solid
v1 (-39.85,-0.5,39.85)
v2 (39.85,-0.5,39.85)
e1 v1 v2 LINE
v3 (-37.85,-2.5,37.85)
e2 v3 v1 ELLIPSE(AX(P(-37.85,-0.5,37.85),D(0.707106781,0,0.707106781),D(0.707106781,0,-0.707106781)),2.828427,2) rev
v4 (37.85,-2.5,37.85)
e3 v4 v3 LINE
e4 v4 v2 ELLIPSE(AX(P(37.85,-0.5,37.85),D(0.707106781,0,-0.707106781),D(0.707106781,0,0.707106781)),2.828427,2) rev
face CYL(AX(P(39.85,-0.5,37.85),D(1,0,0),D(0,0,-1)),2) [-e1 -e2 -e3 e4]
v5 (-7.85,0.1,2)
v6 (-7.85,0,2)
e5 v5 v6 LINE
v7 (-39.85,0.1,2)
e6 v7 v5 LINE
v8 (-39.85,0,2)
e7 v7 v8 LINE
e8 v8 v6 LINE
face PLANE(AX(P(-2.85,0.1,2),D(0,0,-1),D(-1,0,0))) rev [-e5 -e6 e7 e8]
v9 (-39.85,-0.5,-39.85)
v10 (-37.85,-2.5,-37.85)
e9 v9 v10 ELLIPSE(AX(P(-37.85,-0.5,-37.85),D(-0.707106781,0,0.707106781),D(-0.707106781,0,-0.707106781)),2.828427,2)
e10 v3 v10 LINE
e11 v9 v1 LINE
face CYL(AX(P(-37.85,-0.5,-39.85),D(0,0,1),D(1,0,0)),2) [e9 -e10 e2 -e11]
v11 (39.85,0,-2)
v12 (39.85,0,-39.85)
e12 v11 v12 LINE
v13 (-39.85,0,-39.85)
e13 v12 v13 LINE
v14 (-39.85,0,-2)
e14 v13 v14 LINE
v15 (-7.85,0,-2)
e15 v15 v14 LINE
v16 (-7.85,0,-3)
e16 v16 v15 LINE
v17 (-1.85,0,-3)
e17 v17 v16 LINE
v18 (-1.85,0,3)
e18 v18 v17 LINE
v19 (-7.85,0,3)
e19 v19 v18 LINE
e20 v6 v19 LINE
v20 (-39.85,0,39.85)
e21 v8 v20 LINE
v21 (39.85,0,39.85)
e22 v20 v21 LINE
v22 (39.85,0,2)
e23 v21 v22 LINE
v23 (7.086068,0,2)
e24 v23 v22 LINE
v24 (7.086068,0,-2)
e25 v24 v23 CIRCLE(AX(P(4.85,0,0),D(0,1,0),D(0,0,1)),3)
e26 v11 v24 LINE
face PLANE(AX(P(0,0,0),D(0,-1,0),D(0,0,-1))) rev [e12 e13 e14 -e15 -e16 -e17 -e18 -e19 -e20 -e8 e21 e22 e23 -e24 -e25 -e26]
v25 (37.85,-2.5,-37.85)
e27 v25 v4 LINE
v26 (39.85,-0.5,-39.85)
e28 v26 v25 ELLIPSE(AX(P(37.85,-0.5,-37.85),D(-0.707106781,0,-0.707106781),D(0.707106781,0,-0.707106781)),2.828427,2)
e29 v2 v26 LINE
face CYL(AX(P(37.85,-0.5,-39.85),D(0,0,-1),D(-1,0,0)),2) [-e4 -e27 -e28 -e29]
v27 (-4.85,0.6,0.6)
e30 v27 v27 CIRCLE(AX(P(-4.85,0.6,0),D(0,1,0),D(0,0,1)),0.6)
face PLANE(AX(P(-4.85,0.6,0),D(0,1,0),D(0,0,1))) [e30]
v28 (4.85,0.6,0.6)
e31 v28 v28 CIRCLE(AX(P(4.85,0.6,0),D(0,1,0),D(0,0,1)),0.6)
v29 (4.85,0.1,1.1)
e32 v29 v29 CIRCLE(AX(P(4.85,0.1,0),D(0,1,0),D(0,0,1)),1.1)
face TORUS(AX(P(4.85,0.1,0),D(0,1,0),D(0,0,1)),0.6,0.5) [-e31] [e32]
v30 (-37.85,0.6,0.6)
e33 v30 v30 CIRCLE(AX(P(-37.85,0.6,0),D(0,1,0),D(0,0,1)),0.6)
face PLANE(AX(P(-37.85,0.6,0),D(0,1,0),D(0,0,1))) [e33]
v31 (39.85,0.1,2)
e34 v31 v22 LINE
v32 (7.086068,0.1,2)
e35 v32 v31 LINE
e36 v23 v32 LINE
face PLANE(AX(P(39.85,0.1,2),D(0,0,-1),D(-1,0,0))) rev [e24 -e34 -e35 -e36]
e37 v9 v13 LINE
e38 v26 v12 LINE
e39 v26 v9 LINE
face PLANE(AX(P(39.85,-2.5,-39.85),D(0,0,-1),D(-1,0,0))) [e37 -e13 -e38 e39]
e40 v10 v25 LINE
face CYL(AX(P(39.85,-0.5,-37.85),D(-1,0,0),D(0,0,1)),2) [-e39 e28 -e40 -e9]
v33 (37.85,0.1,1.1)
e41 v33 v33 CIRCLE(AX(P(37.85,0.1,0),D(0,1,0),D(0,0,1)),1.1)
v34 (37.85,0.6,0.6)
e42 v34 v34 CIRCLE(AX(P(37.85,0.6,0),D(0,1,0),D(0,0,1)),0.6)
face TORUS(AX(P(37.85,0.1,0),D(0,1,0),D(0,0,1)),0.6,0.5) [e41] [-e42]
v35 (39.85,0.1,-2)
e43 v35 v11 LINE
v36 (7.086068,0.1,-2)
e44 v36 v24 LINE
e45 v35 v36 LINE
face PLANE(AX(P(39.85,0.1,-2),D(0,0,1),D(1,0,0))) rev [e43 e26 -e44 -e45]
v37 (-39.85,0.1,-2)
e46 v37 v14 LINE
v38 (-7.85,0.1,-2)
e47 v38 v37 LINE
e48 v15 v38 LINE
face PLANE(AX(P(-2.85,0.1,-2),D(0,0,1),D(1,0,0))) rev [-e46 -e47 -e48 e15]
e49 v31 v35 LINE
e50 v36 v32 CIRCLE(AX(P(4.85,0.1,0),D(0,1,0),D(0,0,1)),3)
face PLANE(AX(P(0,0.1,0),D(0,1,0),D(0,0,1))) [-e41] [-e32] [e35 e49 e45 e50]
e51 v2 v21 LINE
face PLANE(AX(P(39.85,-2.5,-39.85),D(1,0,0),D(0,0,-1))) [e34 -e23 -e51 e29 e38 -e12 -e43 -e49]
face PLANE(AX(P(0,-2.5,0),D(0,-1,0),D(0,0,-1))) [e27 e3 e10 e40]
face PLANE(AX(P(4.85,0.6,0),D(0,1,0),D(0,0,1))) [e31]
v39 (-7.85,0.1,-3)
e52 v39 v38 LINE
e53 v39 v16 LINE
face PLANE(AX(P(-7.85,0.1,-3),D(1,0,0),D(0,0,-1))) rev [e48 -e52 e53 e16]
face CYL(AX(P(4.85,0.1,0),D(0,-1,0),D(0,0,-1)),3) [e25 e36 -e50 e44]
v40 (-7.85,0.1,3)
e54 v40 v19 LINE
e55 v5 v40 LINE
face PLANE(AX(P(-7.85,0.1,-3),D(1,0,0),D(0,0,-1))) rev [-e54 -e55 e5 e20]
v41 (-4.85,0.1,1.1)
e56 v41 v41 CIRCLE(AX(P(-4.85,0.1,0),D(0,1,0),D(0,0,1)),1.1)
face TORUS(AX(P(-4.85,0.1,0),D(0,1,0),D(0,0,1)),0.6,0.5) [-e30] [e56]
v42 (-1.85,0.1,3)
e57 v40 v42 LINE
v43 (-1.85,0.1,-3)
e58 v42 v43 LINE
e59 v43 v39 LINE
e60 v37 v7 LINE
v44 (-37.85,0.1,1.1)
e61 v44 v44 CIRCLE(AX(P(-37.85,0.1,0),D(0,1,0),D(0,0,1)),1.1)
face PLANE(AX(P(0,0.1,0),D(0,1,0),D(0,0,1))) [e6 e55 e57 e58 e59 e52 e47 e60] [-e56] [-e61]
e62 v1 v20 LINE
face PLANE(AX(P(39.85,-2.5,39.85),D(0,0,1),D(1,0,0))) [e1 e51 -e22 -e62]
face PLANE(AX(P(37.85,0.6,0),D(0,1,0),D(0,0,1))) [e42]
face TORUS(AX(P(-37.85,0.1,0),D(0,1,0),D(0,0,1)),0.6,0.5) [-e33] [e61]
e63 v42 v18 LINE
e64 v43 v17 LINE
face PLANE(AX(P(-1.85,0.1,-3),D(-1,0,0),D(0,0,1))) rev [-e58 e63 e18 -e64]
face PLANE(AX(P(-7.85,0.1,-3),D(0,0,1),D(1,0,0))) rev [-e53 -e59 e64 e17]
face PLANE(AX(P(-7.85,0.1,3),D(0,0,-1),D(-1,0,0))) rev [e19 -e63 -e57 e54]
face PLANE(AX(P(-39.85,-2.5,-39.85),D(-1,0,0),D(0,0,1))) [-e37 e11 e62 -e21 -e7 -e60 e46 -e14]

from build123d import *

# Parameters (mm, degrees)
SKETCH_1_W      = 79.7
SKETCH_1_H      = 79.7
EXTRUDE_1_DEPTH = 2.5
FILLET_1_R      = 2
SKETCH_2_W      = 37
SKETCH_2_H      = 4
EXTRUDE_2_DEPTH = 0.1
SKETCH_3_R      = 3
SKETCH_3_W      = 6
SKETCH_3_H      = 6
EXTRUDE_3_DEPTH = 0.1
SKETCH_4_R      = 1.1
EXTRUDE_4_DEPTH = 0.5
FILLET_2_R      = 0.5


with BuildPart() as part:
    # Эскиз1 → Бобышка-Вытянуть1 (new body)
    with BuildSketch(Plane(origin=(0, 0, 0), x_dir=(1, 0, 0), z_dir=(0, 1, 0))):
        Rectangle(SKETCH_1_W, SKETCH_1_H)
    extrude(amount=-EXTRUDE_1_DEPTH)

    # Скругление1
    fillet_1_edges = [part.edges().sort_by_distance(p)[0] for p in [
        (39.85, -2.5, 0),
        (0, -2.5, -39.85),
        (-39.85, -2.5, 0),
        (0, -2.5, 39.85),
    ]]
    fillet(fillet_1_edges, radius=FILLET_1_R)

    # Эскиз2 → Бобышка-Вытянуть2 (add)
    with BuildSketch(Plane(origin=(0, 0, 0), x_dir=(1, 0, 0), z_dir=(0, 1, 0))):
        with Locations((21.35, 0)):
            Rectangle(SKETCH_2_W, SKETCH_2_H)
        with Locations((-21.35, 0)):
            Rectangle(SKETCH_2_W, SKETCH_2_H)
    extrude(amount=EXTRUDE_2_DEPTH)

    # Эскиз3 → Бобышка-Вытянуть3 (add)
    with BuildSketch(Plane(origin=(0, 0, 0), x_dir=(1, 0, 0), z_dir=(0, 1, 0))):
        with Locations((4.85, 0)):
            Circle(SKETCH_3_R)
        with Locations((-4.85, 0)):
            Rectangle(SKETCH_3_W, SKETCH_3_H)
    extrude(amount=EXTRUDE_3_DEPTH)

    # Эскиз4 → Бобышка-Вытянуть4 (add)
    with BuildSketch(Plane(origin=(0, 0.1, 0), x_dir=(1, 0, 0), z_dir=(0, 1, 0))):
        with Locations(Location((4.85, 0, 0), (0, 0, 270))):
            Circle(SKETCH_4_R)
        with Locations(Location((-4.85, 0, 0), (0, 0, 270))):
            Circle(SKETCH_4_R)
        with Locations(Location((37.85, 0, 0), (0, 0, 270))):
            Circle(SKETCH_4_R)
        with Locations(Location((-37.85, 0, 0), (0, 0, 270))):
            Circle(SKETCH_4_R)
    extrude(amount=EXTRUDE_4_DEPTH)

    # Скругление2
    fillet_2_edges = [part.edges().sort_by_distance(p)[0] for p in [
        (4.85, 0.6, -1.1),
        (-4.85, 0.6, -1.1),
        (37.85, 0.6, -1.1),
        (-37.85, 0.6, -1.1),
    ]]
    fillet(fillet_2_edges, radius=FILLET_2_R - 0.0001)  # a hair under: the kernel refuses the full size


solid = part.part
